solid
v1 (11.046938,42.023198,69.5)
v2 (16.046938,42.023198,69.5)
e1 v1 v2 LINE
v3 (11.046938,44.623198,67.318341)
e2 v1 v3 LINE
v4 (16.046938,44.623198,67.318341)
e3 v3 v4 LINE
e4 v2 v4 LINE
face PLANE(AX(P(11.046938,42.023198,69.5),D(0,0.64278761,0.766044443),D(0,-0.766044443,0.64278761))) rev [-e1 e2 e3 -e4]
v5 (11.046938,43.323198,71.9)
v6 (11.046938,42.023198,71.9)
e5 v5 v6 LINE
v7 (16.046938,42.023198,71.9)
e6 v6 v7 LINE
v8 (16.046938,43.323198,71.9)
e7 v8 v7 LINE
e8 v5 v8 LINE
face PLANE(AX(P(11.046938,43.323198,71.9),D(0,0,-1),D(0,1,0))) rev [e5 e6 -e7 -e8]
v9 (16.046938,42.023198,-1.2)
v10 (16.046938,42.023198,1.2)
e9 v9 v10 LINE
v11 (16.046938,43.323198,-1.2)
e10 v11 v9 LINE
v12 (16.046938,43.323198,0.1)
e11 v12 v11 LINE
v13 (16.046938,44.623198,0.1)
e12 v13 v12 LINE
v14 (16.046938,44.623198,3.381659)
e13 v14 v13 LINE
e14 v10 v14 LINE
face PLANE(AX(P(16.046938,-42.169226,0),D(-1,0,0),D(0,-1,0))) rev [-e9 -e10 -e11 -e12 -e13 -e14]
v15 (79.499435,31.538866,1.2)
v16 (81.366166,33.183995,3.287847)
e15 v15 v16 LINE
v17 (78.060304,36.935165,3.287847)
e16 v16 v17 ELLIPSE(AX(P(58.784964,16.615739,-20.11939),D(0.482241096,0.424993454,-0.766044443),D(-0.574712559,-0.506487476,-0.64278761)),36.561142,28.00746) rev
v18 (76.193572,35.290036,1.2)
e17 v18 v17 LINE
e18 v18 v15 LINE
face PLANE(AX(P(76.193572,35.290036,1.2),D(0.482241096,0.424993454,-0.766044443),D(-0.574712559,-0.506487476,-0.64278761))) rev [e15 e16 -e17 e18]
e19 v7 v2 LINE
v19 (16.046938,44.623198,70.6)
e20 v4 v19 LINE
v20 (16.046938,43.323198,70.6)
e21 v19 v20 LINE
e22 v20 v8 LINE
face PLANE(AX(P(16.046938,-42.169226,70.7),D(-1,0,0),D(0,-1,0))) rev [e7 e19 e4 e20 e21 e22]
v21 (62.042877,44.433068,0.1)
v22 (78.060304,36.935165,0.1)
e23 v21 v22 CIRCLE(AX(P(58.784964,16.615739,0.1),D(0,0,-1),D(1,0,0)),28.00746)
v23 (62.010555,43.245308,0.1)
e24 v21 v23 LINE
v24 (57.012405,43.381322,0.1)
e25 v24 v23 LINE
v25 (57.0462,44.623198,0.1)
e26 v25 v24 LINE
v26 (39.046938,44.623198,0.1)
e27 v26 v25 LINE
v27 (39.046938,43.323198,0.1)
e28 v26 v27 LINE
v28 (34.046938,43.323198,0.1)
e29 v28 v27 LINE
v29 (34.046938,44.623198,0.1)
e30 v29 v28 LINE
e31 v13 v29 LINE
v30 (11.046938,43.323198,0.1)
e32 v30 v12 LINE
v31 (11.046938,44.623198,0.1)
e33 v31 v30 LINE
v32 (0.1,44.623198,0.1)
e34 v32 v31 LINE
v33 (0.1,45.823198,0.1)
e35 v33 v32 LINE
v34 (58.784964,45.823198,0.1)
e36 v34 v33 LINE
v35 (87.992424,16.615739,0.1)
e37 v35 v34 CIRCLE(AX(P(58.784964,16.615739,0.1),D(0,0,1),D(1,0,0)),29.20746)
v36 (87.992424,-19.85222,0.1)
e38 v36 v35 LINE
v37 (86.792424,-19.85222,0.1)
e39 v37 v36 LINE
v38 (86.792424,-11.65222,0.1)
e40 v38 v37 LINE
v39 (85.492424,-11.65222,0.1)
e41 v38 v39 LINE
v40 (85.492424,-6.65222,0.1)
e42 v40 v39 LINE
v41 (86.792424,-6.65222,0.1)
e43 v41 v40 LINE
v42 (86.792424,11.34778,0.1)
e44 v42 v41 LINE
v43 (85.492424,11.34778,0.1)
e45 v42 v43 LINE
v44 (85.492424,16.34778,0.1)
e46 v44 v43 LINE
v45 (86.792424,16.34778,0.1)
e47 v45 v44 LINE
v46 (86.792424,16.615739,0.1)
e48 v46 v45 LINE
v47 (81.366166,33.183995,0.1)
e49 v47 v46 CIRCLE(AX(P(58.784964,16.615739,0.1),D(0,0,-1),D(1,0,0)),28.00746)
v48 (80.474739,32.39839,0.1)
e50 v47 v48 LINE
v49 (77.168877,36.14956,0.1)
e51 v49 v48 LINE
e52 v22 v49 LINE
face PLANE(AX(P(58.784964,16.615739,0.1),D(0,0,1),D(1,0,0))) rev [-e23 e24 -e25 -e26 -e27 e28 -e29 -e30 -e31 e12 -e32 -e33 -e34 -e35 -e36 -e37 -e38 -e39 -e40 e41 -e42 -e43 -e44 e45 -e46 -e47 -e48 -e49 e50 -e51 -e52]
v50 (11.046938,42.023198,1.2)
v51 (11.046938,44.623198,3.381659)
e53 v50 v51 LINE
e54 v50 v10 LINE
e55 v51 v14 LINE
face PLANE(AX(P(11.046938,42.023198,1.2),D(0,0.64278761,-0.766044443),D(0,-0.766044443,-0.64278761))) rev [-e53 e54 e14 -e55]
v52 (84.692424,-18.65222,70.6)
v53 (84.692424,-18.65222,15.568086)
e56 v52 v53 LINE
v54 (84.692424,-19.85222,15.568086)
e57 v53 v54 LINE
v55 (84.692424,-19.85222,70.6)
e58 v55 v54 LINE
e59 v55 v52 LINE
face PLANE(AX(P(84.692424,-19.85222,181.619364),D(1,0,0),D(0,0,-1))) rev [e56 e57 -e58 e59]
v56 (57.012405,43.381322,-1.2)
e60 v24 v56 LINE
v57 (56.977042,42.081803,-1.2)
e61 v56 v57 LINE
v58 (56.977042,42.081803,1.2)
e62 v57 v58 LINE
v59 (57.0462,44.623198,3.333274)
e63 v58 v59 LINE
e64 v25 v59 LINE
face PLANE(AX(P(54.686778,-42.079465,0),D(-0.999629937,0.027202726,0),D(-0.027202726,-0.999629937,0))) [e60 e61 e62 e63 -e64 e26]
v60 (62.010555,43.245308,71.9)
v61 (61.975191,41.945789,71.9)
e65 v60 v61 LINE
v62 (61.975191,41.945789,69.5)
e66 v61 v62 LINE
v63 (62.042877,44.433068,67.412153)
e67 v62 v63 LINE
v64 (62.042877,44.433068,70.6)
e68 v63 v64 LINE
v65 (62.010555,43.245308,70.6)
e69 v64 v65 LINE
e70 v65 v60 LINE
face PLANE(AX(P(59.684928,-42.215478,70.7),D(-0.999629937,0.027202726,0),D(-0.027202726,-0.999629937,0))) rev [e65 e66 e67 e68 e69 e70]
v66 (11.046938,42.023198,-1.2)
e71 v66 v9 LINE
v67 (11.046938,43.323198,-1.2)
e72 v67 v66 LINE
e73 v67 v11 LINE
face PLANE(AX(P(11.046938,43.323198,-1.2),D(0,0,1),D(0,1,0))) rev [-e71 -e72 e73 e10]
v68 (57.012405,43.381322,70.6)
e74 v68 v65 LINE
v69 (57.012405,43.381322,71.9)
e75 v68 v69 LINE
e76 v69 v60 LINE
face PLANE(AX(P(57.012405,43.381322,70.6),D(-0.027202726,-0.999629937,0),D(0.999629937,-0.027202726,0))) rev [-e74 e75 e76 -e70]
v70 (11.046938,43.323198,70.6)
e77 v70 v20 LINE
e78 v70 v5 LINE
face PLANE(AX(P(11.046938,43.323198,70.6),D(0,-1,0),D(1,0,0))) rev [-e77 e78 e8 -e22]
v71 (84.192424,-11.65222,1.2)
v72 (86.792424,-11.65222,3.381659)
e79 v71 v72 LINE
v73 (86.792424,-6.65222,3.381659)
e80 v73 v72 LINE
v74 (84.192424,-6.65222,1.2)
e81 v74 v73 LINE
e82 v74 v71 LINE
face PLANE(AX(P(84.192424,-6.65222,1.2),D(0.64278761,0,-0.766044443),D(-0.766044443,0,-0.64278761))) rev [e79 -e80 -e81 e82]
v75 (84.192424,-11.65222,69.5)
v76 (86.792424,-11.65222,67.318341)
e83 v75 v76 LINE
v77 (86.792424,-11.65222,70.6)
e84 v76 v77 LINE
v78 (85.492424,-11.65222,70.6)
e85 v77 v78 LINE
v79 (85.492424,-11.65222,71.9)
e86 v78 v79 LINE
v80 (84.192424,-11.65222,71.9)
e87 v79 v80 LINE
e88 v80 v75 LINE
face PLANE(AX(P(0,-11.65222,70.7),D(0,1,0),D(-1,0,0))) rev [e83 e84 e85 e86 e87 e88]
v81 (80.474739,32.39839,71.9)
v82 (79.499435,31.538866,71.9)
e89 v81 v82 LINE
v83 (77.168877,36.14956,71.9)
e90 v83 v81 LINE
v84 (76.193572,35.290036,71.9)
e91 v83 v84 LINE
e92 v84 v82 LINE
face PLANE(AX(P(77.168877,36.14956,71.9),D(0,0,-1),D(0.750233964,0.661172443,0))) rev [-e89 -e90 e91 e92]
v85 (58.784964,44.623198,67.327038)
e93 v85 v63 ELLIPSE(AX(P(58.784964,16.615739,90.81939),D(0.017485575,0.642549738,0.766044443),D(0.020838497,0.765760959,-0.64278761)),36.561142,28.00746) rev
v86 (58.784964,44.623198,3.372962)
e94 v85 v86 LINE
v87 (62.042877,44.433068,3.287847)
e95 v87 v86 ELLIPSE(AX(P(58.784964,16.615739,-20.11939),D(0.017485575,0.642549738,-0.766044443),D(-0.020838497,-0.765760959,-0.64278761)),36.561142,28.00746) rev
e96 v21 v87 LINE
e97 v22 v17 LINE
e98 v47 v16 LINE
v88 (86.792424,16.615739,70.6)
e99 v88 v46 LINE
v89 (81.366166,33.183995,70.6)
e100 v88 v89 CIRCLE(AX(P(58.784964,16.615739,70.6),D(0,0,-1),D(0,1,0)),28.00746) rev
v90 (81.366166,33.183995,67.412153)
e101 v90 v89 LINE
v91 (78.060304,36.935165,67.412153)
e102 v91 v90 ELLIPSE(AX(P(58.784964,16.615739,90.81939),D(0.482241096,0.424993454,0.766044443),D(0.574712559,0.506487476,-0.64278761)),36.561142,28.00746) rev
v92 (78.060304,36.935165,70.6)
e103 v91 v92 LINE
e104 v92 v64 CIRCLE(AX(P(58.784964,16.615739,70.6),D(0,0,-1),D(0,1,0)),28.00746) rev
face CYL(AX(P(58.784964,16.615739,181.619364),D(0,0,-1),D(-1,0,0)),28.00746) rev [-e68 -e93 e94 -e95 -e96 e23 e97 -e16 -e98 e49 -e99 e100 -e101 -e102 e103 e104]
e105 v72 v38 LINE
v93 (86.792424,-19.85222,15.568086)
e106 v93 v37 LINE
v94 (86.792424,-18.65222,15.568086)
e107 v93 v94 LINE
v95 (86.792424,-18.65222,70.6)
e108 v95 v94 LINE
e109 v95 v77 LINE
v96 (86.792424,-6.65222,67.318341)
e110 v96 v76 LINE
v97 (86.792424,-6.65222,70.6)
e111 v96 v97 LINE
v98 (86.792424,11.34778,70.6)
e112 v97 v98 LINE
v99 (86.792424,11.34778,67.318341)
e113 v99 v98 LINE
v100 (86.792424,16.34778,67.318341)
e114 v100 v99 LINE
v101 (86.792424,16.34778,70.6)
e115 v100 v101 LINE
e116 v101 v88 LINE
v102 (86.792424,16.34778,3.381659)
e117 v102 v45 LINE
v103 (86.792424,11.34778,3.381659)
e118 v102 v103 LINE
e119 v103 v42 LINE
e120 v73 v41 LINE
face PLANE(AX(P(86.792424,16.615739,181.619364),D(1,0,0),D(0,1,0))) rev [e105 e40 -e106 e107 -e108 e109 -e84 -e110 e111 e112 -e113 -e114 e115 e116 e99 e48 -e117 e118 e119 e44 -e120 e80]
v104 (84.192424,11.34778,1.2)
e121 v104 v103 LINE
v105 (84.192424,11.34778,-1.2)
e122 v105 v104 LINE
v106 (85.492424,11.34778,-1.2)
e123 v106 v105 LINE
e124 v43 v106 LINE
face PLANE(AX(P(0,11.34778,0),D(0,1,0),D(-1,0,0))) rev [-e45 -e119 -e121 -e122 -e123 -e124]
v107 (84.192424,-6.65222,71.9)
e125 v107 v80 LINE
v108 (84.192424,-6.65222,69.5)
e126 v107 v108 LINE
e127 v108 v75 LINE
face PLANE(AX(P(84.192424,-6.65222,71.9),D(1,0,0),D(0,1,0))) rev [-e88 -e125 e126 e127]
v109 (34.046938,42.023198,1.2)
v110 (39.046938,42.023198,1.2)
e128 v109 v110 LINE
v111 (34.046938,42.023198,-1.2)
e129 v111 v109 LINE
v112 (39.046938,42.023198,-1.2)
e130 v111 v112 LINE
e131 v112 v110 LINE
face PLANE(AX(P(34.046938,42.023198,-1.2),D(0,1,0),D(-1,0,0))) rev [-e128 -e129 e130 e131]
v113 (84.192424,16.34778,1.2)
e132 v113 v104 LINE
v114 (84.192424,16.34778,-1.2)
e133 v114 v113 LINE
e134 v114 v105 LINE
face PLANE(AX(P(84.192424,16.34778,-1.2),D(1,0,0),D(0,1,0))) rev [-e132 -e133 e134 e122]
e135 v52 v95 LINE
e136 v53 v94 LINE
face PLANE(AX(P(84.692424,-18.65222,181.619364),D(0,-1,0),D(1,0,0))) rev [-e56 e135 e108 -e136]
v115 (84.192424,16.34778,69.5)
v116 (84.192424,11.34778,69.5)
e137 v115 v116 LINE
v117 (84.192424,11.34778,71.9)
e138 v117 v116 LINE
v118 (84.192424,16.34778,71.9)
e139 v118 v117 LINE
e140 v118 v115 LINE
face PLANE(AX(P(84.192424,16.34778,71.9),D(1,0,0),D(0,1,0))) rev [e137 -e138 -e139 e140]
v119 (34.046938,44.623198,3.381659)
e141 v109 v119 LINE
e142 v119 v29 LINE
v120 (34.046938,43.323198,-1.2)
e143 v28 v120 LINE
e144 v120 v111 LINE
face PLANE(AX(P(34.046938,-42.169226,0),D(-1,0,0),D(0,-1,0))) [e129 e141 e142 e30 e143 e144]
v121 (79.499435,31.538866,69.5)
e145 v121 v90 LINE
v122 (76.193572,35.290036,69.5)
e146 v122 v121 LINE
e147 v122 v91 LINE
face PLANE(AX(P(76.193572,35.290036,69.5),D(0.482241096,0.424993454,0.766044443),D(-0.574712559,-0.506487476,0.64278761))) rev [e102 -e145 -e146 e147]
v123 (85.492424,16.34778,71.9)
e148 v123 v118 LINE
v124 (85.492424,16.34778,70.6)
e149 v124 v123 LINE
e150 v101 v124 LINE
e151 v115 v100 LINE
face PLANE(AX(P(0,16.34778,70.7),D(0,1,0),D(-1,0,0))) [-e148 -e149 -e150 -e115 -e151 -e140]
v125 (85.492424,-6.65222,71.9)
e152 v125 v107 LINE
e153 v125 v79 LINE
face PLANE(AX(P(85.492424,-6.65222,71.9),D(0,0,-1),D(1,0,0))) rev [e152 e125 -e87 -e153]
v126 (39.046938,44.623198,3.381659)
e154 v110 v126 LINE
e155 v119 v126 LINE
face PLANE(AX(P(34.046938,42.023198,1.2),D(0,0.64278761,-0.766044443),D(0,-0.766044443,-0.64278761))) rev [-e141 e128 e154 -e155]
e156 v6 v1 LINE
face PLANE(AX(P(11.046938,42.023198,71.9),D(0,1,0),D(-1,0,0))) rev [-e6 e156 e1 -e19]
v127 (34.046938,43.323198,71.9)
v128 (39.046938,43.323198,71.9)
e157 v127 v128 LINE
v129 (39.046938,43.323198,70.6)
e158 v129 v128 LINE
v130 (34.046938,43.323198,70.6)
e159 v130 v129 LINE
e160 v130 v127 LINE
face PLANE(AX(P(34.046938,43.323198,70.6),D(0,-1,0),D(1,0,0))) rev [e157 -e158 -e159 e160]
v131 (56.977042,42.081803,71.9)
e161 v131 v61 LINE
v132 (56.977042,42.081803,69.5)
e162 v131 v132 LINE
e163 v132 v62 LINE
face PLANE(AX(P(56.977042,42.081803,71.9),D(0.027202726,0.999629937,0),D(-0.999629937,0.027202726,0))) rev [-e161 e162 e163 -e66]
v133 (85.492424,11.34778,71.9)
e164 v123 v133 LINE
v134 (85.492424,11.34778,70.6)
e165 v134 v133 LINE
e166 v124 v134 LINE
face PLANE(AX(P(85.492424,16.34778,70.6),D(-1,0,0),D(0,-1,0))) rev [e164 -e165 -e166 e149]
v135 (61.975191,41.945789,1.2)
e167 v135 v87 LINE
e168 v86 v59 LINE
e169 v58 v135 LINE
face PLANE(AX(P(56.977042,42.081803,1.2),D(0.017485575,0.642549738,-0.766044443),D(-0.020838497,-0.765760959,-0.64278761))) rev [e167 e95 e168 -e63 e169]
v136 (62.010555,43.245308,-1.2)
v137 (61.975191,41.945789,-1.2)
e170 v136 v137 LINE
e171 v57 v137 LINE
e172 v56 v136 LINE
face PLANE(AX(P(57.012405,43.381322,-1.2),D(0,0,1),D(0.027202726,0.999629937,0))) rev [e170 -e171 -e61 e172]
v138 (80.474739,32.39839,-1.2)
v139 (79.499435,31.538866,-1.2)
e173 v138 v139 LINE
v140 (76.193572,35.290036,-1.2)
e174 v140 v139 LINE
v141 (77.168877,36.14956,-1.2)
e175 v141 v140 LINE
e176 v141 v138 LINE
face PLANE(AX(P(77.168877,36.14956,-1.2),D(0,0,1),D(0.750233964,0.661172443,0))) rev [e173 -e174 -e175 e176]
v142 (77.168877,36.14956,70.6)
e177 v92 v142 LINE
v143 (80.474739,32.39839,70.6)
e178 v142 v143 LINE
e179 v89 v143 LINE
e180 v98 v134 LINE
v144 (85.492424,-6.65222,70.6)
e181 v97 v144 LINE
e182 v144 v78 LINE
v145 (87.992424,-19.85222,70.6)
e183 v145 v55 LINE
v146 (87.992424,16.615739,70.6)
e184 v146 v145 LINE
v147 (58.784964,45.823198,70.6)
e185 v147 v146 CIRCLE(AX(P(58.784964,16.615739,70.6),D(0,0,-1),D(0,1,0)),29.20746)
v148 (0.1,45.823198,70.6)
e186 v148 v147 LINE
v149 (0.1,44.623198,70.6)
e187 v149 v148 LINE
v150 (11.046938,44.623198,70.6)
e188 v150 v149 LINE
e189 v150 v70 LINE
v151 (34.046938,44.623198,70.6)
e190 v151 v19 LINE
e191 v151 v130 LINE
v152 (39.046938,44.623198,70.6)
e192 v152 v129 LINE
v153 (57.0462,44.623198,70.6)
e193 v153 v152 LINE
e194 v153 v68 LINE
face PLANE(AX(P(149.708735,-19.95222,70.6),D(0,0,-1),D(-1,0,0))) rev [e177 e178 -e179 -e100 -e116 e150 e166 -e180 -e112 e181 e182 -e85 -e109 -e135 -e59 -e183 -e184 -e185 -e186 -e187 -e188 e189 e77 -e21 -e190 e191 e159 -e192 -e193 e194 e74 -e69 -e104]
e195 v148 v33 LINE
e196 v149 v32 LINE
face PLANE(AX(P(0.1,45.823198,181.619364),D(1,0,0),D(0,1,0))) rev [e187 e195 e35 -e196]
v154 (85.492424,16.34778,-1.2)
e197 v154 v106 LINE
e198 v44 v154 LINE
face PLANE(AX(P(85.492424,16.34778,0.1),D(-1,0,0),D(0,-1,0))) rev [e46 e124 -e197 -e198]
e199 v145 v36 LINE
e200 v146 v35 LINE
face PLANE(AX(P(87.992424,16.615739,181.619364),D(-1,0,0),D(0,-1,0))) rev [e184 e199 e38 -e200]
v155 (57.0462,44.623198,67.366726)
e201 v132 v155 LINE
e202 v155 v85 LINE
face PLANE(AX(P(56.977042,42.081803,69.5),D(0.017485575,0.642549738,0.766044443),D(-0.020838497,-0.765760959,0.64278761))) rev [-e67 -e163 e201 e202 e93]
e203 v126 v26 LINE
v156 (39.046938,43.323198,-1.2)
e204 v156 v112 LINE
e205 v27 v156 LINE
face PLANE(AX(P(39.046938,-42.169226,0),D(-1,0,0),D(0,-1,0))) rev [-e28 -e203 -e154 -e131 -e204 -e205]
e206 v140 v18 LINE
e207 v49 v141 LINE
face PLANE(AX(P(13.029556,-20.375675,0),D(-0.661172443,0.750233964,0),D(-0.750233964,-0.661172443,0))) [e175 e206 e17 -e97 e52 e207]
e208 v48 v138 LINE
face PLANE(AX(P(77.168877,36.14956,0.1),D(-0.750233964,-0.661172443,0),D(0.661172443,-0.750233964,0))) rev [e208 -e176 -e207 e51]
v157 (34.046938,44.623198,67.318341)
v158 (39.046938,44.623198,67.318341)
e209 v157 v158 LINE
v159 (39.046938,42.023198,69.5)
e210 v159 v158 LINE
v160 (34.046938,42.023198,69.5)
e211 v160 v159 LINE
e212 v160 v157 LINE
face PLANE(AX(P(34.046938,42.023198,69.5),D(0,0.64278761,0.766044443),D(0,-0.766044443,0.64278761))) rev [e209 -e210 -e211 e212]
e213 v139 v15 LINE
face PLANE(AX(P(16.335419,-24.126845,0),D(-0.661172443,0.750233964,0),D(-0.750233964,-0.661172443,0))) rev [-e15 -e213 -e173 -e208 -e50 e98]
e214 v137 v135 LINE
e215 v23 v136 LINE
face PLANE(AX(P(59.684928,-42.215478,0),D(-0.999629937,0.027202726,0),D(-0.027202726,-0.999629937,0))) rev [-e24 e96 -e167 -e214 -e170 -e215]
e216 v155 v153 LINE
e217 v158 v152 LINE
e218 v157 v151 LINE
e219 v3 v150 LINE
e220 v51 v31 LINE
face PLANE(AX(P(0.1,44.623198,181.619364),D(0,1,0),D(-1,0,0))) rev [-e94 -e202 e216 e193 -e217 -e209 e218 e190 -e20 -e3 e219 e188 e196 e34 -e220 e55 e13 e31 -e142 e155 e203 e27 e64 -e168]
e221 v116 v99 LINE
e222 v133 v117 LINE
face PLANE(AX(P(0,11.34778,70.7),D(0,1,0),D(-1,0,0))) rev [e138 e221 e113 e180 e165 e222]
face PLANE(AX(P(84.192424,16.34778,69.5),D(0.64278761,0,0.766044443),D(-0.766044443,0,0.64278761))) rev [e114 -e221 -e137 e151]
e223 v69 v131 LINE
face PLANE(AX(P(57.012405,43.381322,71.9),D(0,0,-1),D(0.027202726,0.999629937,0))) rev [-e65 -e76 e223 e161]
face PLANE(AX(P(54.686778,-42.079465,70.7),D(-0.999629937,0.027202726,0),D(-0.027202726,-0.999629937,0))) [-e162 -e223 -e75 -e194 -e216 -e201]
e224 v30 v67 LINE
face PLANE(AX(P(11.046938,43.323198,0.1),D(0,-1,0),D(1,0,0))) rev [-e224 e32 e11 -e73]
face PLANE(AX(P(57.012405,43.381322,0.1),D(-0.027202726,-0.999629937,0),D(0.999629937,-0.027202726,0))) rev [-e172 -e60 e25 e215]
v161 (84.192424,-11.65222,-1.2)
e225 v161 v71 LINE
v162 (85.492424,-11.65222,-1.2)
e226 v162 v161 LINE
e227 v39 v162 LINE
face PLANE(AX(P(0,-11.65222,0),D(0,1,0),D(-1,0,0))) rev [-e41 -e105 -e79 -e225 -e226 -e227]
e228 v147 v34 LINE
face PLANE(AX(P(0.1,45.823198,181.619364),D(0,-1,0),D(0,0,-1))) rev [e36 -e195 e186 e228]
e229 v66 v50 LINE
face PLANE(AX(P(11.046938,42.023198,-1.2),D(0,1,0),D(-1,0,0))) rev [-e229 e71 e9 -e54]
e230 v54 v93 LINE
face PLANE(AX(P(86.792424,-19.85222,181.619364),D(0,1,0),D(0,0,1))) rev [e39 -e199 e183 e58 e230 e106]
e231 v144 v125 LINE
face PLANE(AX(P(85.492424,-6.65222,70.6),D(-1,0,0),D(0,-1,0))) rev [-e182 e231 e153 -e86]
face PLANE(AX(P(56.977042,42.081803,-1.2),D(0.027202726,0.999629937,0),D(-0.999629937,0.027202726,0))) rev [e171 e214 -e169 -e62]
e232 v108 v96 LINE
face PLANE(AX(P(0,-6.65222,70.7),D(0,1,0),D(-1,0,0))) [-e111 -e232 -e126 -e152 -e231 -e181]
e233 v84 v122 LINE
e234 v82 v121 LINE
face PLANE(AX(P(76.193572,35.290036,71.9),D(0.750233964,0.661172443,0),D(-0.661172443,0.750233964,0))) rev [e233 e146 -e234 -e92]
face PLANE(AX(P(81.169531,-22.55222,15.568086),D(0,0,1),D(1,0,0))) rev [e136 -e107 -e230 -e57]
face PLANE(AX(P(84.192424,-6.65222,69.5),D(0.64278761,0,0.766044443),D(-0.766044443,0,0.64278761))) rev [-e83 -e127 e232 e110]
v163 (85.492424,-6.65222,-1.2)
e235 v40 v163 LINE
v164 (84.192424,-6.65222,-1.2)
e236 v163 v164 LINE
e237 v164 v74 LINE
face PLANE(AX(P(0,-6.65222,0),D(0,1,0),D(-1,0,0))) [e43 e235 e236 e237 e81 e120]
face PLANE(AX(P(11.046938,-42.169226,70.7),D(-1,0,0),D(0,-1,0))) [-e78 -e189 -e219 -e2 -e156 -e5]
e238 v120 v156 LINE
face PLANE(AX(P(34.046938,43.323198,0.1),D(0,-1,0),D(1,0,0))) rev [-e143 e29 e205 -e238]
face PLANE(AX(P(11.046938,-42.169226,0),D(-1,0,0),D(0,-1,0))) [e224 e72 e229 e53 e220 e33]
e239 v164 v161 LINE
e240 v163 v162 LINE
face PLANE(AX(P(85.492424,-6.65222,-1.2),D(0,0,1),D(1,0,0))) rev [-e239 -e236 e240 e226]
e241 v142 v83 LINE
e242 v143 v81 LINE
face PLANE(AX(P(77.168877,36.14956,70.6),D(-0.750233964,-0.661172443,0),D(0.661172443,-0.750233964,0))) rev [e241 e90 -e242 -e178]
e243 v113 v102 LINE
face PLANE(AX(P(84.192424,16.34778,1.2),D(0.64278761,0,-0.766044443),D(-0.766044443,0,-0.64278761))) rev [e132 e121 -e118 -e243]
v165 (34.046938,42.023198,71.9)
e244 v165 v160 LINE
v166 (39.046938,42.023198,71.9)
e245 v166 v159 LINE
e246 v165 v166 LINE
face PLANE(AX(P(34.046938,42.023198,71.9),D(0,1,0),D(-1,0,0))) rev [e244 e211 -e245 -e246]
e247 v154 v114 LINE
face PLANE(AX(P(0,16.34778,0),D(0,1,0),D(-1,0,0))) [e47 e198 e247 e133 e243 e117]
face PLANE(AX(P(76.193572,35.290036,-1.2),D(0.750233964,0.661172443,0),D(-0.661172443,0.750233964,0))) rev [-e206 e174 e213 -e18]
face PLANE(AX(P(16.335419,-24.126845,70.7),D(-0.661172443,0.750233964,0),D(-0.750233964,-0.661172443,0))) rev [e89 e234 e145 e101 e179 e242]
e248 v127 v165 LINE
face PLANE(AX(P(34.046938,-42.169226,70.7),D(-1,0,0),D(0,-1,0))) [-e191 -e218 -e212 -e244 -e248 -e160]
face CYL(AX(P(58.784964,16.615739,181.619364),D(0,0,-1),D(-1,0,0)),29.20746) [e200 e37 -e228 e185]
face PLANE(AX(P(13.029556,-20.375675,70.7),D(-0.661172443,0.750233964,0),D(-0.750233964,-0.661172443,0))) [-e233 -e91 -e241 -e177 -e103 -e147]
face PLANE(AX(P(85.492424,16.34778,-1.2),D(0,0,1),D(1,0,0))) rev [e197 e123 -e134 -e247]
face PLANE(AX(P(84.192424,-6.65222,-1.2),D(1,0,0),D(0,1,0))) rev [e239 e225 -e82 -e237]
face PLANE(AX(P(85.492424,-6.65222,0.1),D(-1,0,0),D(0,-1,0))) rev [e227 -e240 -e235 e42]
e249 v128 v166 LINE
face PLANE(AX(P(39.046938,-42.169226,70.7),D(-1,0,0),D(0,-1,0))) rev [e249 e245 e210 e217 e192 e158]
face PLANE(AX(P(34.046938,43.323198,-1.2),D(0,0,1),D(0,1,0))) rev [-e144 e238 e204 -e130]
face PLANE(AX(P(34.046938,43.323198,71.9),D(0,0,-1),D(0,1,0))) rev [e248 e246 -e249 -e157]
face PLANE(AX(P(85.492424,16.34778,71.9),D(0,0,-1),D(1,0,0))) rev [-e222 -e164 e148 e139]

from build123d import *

# Parameters (mm, degrees)
EXTRUDE_START           = 0.1
EXTRUDE_1_DEPTH         = 70.5
SKETCH_2_W              = 5.622893455
SKETCH_2_H              = 15.568085914
CUT_EXTRUDE_1_DEPTH     = 3.9
EXTRUDE_START_2         = 7
EXTRUDE_2_DEPTH         = 5
PATTERN_START           = 11.046937644
PATTERN_CURVE_4_DEPTH   = 5
PATTERN_START_2         = 34.046937644
PATTERN_CURVE_4_2_DEPTH = 5
PATTERN_START_3         = 55.811216895
PATTERN_CURVE_4_3_DEPTH = 5
PATTERN_START_4         = 23.901307005
PATTERN_CURVE_4_4_DEPTH = 5
PATTERN_START_5         = 11.347780174
PATTERN_CURVE_4_5_DEPTH = 5


# Read off the part's stored shape, not the designer's step: Кривая4
with BuildPart() as part:
    # Эскиз1 → Бобышка-Вытянуть1 (new body)
    with BuildSketch(Plane.XY.offset(EXTRUDE_START)):
        with BuildLine():
            Line((87.992424037, 16.615738698), (87.992424037, -19.852219826))
            Line((87.992424037, -19.852219826), (86.792424037, -19.852219826))
            Line((86.792424037, -19.852219826), (84.692424037, -19.852219826))
            Line((84.692424037, -19.852219826), (84.692424037, -18.652219826))
            Line((84.692424037, -18.652219826), (86.792424037, -18.652219826))
            Line((86.792424037, -18.652219826), (86.792424037, 16.615738698))
            ThreePointArc((86.792424037, 16.615738698), (78.589229033, 36.420003331), (58.7849644, 44.623198335))
            Line((58.7849644, 44.623198335), (0.1, 44.623198335))
            Line((0.1, 44.623198335), (0.1, 45.823198335))
            Line((0.1, 45.823198335), (58.7849644, 45.823198335))
            ThreePointArc((58.7849644, 45.823198335), (79.43775717, 37.268531468), (87.992424037, 16.615738698))
        make_face()
    extrude(amount=EXTRUDE_1_DEPTH)

    # Эскиз2 → Вырез-Вытянуть1 (cut)
    with BuildSketch(Plane(origin=(0, -18.652219826, 0), x_dir=(1, 0, 0), z_dir=(0, 1, 0))):
        with Locations((83.98097731, -7.784042957)):
            Rectangle(SKETCH_2_W, SKETCH_2_H)
    extrude(amount=-CUT_EXTRUDE_1_DEPTH, mode=Mode.SUBTRACT)


with BuildPart() as body_2:
    # Эскиз4 → Бобышка-Вытянуть2 (new body)
    with BuildSketch(Plane(origin=(0, -18.652219826, 0), x_dir=(1, 0, 0), z_dir=(0, 1, 0)).offset(EXTRUDE_START_2)):
        Polygon((86.792424037, -0.1), (85.492424037, -0.1), (85.492424037, 1.2), (84.192424037, 1.2), (84.192424037, -1.2), (86.792424037, -3.381659041), align=None)
    extrude(amount=EXTRUDE_2_DEPTH)


with BuildPart() as body_3:
    # Кривая4 outline → Кривая4 (new body)
    with BuildSketch(Plane.YZ.offset(PATTERN_START)):
        Polygon((44.623198335, 0.1), (44.623198335, 3.381659041), (42.023198335, 1.2), (42.023198335, -1.2), (43.323198335, -1.2), (43.323198335, 0.1), align=None)
    extrude(amount=PATTERN_CURVE_4_DEPTH)


with BuildPart() as body_4:
    # Pattern Curve 4 2 outline → Pattern Curve 4 2 (new body)
    with BuildSketch(Plane.YZ.offset(PATTERN_START_2)):
        Polygon((44.623198335, 0.1), (44.623198335, 3.381659041), (42.023198335, 1.2), (42.023198335, -1.2), (43.323198335, -1.2), (43.323198335, 0.1), align=None)
    extrude(amount=PATTERN_CURVE_4_2_DEPTH)


with BuildPart() as body_5:
    # Pattern Curve 4 3 outline → Pattern Curve 4 3 (new body)
    with BuildSketch(Plane(origin=(0, 0, 0), x_dir=(0.0272027259746655, 0.999629937376601, 0), z_dir=(0.999629937376601, -0.0272027259746655, 0)).offset(PATTERN_START_3)):
        Polygon((44.916160749, 0.1), (46.216160749, 0.1), (46.216160749, 3.381659041), (43.616160749, 1.2), (43.616160749, -1.2), (44.916160749, -1.2), align=None)
    extrude(amount=PATTERN_CURVE_4_3_DEPTH)


with BuildPart() as body_6:
    # Pattern Curve 4 4 outline → Pattern Curve 4 4 (new body)
    with BuildSketch(Plane(origin=(0, 0, 0), x_dir=(0.7502339640677542, 0.6611724428310543, 0), z_dir=(0.6611724428310543, -0.7502339640677542, 0)).offset(PATTERN_START_4)):
        Polygon((81.79580505, 0.1), (83.09580505, 0.1), (83.09580505, 3.381659041), (80.49580505, 1.2), (80.49580505, -1.2), (81.79580505, -1.2), align=None)
    extrude(amount=PATTERN_CURVE_4_4_DEPTH)


with BuildPart() as body_7:
    # Pattern Curve 4 5 outline → Pattern Curve 4 5 (new body)
    with BuildSketch(Plane(origin=(0, 0, 0), x_dir=(1, 0, 0), z_dir=(0, 1, 0)).offset(PATTERN_START_5)):
        Polygon((86.792424037, -0.1), (85.492424037, -0.1), (85.492424037, 1.2), (84.192424037, 1.2), (84.192424037, -1.2), (86.792424037, -3.381659041), align=None)
    extrude(amount=PATTERN_CURVE_4_5_DEPTH)


with BuildPart() as body_8:
    # Зеркальное отражение3: mirrored copy
    add(body_3.part.mirror(Plane.XY.offset(35.35)))


with BuildPart() as body_9:
    # Mirror 3 2: mirrored copy
    add(body_4.part.mirror(Plane.XY.offset(35.35)))


with BuildPart() as body_10:
    # Mirror 3 3: mirrored copy
    add(body_5.part.mirror(Plane.XY.offset(35.35)))


with BuildPart() as body_11:
    # Mirror 3 4: mirrored copy
    add(body_6.part.mirror(Plane.XY.offset(35.35)))


with BuildPart() as body_12:
    # Mirror 3 5: mirrored copy
    add(body_7.part.mirror(Plane.XY.offset(35.35)))


with BuildPart() as body_13:
    # Mirror 3 6: mirrored copy
    add(body_2.part.mirror(Plane.XY.offset(35.35)))


with BuildPart() as part_1:
    add(part.part)

    # Combine 1: union body 2, body 7, body 6, body 5, body 4, body 3, body 8, body 9, body 10, body 11, body 12, body 13
    add(body_2.part)
    add(body_7.part)
    add(body_6.part)
    add(body_5.part)
    add(body_4.part)
    add(body_3.part)
    add(body_8.part)
    add(body_9.part)
    add(body_10.part)
    add(body_11.part)
    add(body_12.part)
    add(body_13.part)


solid = part_1.part
